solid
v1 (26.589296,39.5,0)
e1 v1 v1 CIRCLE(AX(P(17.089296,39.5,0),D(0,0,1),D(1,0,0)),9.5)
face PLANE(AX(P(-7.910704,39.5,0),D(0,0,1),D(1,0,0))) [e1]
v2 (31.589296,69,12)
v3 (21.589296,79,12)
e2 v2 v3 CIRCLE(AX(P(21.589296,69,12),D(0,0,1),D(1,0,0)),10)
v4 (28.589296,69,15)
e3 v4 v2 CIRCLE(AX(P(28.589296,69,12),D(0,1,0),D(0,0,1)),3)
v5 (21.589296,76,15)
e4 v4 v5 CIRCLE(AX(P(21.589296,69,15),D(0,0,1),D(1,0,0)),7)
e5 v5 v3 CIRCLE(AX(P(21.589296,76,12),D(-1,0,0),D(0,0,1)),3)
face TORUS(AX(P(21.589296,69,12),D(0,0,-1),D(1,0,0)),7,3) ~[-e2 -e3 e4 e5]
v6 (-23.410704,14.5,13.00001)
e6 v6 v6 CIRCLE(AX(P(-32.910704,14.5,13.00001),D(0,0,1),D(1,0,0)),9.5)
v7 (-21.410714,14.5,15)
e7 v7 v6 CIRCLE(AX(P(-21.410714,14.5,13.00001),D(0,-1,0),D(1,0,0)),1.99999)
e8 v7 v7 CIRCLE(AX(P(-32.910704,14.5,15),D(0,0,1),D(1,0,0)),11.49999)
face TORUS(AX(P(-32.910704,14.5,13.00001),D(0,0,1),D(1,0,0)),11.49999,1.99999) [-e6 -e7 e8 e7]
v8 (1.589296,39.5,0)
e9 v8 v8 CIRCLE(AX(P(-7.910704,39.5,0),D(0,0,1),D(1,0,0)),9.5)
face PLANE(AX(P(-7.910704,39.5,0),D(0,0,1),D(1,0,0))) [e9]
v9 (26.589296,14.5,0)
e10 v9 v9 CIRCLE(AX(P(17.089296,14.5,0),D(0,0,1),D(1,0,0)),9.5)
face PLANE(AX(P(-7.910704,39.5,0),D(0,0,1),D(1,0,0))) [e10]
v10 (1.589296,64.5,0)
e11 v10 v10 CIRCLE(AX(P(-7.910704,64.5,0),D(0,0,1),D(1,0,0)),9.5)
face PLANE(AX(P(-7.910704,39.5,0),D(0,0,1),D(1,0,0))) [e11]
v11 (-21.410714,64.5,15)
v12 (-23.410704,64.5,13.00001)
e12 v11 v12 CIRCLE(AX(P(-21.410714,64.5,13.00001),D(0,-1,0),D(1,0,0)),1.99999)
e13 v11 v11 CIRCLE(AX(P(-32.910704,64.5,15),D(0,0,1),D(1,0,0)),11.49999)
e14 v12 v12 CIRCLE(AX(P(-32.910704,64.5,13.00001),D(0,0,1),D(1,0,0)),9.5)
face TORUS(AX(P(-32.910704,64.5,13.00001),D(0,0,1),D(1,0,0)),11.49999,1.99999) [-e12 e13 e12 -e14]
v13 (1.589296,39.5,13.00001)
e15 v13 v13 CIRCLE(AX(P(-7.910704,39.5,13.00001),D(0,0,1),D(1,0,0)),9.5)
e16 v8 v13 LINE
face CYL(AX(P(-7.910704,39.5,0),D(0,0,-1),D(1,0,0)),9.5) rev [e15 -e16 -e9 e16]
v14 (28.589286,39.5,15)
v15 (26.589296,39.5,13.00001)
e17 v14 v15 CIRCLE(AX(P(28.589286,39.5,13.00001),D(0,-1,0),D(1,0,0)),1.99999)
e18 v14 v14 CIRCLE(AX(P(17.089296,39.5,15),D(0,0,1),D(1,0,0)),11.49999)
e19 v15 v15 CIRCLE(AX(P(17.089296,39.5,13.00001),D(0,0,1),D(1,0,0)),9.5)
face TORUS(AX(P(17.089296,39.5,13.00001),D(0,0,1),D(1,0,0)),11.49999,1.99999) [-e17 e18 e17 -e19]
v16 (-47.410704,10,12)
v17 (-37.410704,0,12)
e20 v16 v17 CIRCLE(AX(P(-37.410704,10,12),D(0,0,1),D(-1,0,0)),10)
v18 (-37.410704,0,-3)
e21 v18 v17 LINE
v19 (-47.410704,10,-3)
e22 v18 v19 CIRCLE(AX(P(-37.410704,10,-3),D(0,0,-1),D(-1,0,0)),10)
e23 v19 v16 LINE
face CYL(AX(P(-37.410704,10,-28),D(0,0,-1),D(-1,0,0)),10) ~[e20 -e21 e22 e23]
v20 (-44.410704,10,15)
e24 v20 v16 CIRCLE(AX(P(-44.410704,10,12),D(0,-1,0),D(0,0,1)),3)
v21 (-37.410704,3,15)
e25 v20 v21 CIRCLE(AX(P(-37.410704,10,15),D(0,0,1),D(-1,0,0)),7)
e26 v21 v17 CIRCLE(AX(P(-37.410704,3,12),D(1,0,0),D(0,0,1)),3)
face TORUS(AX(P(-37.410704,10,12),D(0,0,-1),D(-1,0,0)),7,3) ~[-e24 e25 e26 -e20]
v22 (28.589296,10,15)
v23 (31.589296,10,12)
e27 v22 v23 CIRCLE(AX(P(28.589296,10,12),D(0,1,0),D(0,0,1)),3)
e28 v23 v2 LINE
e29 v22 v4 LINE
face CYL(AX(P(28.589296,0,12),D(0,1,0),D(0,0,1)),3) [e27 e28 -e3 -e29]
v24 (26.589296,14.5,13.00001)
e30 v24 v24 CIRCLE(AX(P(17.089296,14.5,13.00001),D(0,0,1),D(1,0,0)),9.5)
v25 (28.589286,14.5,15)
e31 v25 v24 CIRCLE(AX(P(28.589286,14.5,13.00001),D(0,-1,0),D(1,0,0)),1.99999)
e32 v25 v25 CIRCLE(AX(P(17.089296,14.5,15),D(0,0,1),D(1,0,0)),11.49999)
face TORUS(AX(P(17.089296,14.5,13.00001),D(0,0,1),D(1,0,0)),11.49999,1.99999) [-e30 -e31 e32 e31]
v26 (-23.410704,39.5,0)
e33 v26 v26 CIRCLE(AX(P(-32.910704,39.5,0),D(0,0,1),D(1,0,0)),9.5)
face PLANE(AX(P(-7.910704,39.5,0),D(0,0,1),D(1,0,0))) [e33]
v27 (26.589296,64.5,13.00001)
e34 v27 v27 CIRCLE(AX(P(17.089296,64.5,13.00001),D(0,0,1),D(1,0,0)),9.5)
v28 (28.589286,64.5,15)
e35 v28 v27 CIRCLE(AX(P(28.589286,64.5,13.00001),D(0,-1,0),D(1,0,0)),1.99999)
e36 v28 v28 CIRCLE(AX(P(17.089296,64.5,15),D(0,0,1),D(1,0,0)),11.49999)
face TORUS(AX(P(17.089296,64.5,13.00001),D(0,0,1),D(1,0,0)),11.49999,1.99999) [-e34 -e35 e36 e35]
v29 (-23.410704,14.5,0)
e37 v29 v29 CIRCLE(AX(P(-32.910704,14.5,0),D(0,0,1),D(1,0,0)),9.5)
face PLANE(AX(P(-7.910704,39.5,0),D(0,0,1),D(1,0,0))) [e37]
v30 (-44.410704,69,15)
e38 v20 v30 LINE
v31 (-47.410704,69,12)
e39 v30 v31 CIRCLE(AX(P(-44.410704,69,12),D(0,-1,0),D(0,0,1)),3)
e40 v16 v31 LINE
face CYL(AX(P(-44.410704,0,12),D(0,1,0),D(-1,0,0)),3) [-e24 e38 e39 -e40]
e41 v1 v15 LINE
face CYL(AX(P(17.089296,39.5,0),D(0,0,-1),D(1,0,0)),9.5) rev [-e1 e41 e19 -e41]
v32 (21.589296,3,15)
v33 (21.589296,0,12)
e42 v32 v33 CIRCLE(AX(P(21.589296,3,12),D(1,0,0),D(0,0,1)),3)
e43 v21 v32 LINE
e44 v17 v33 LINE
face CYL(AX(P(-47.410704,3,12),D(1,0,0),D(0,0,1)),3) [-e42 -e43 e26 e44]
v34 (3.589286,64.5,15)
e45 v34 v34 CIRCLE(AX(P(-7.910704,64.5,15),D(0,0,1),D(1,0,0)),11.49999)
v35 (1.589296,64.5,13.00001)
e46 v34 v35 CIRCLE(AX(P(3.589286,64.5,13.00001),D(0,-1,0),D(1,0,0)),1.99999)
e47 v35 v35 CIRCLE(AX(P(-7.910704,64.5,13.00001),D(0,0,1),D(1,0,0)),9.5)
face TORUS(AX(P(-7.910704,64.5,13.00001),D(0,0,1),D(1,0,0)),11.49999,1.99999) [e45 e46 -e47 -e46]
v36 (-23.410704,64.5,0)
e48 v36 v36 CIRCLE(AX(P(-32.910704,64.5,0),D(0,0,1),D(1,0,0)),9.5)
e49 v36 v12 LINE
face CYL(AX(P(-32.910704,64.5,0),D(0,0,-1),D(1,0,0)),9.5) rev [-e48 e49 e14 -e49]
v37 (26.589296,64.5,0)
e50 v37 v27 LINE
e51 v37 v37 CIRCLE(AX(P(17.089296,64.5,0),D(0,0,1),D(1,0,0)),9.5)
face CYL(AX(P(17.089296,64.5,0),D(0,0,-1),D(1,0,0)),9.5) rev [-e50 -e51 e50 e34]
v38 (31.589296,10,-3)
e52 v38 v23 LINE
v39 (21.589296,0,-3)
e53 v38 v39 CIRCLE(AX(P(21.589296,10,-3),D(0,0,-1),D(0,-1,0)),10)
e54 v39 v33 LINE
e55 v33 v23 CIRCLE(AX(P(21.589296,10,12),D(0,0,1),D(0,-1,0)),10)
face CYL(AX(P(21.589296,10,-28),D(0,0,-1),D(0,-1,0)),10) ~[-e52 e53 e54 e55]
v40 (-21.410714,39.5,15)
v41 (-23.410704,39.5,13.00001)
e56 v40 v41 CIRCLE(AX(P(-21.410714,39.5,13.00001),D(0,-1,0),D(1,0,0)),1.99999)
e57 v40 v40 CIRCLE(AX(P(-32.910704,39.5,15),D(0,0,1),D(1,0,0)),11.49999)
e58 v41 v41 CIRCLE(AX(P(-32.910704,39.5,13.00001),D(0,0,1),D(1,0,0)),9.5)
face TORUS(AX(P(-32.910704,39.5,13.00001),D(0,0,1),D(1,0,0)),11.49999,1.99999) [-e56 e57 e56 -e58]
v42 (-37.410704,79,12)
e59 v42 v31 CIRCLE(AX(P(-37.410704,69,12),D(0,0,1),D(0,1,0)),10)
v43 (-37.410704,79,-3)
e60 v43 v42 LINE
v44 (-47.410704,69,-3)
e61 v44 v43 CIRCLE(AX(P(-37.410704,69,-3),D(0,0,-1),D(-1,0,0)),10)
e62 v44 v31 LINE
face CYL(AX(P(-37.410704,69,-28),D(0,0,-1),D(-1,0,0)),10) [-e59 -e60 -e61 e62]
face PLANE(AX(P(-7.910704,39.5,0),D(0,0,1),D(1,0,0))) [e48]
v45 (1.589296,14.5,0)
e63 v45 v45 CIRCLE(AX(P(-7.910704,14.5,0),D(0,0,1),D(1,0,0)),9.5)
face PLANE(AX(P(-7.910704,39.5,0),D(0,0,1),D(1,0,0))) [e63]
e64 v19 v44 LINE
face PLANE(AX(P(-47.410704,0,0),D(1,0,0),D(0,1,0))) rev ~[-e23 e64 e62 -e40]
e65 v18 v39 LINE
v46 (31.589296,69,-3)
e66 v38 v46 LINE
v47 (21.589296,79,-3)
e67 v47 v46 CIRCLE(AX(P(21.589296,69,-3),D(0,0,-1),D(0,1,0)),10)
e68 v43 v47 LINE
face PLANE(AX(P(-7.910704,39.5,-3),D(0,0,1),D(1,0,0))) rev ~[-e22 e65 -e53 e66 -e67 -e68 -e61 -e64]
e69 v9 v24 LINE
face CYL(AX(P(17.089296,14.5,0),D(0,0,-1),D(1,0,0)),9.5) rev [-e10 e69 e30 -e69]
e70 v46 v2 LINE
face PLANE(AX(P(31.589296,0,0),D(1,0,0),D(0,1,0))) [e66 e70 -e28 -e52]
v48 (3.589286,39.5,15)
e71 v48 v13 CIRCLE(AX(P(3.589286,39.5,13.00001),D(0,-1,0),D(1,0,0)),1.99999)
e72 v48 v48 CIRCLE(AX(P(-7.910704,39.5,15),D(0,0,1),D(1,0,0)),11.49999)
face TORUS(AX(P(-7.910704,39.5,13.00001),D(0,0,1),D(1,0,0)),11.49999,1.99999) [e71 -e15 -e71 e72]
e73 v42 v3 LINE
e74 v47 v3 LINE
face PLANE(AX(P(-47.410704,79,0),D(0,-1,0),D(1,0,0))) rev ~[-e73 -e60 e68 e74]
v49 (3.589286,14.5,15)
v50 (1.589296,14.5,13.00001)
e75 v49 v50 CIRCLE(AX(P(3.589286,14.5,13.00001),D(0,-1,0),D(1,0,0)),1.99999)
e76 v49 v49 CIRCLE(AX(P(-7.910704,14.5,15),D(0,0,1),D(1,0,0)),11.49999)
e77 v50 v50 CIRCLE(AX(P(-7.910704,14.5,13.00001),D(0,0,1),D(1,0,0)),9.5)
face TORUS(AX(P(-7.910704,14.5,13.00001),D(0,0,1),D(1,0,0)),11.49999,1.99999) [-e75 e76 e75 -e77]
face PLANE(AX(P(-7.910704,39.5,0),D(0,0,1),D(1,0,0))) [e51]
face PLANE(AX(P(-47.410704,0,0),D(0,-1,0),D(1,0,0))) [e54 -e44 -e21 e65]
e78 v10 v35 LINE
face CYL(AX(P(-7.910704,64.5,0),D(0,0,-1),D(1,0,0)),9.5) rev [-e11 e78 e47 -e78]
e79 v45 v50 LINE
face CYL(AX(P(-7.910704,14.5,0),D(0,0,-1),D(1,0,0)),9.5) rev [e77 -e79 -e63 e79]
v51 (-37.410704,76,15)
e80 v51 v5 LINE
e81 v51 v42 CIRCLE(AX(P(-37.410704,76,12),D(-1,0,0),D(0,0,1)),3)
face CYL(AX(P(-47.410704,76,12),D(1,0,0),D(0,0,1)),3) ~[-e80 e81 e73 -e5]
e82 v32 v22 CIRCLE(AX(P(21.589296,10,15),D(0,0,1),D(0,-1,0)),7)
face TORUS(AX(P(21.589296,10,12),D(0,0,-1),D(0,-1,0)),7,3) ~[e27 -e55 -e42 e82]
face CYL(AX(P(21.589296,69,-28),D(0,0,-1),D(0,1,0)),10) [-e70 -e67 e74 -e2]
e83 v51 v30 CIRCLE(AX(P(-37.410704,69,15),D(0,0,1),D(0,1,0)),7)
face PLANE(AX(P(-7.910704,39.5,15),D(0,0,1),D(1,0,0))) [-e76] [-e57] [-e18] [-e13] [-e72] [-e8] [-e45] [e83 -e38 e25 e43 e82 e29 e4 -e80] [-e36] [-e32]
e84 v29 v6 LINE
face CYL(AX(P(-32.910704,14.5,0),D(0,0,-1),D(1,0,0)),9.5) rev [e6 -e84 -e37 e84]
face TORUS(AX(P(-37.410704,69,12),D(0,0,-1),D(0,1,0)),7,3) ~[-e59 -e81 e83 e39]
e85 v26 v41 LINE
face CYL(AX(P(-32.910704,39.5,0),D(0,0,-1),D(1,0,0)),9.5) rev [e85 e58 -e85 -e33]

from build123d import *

# Parameters (mm, degrees)
F0_W         = 79
F0_H         = 79
F0_R         = 9.5
F1_DEPTH     = 15
F2_DEPTH     = 3
F3_R         = 3
F4_R         = 1.99999
F5_T1_DEPTH  = 43
F5_T4_ANGLE  = 90
F5_T6_ANGLE  = 90
F5_T8_ANGLE  = 90
F5_T10_ANGLE = 90


# Not quite as in the source:
# - a fillet or chamfer that OpenCascade refuses, or shapes differently, is made with other operations: its cross-section is extruded or revolved along the edge and cut away or added
# - a fillet or chamfer is up to 0.001 mm smaller than in the source, because OpenCascade refuses the exact size


with BuildPart() as f1:
    # F0 (on Top) → F1 (new body)
    with BuildSketch(Plane.XY):
        with Locations((-7.91070396, 39.5)):
            Rectangle(F0_W, F0_H)
        with Locations((-32.91070396, 14.5)):
            Circle(F0_R, mode=Mode.SUBTRACT)
        with Locations((-7.91070396, 14.5)):
            Circle(F0_R, mode=Mode.SUBTRACT)
        with Locations((17.08929604, 14.5)):
            Circle(F0_R, mode=Mode.SUBTRACT)
        with Locations((-32.91070396, 39.5)):
            Circle(F0_R, mode=Mode.SUBTRACT)
        with Locations((-32.91070396, 64.5)):
            Circle(F0_R, mode=Mode.SUBTRACT)
        with Locations((-7.91070396, 39.5)):
            Circle(F0_R, mode=Mode.SUBTRACT)
        with Locations((17.08929604, 39.5)):
            Circle(F0_R, mode=Mode.SUBTRACT)
        with Locations((-7.91070396, 64.5)):
            Circle(F0_R, mode=Mode.SUBTRACT)
        with Locations((17.08929604, 64.5)):
            Circle(F0_R, mode=Mode.SUBTRACT)
    extrude(amount=F1_DEPTH)

    # F0 (on Top) → F2 (join)
    with BuildSketch(Plane.XY):
        with Locations((-7.91070396, 39.5)):
            Rectangle(F0_W, F0_H)
        with Locations((-32.91070396, 14.5)):
            Circle(F0_R, mode=Mode.SUBTRACT)
        with Locations((-7.91070396, 14.5)):
            Circle(F0_R, mode=Mode.SUBTRACT)
        with Locations((17.08929604, 14.5)):
            Circle(F0_R, mode=Mode.SUBTRACT)
        with Locations((-32.91070396, 39.5)):
            Circle(F0_R, mode=Mode.SUBTRACT)
        with Locations((-32.91070396, 64.5)):
            Circle(F0_R, mode=Mode.SUBTRACT)
        with Locations((-7.91070396, 39.5)):
            Circle(F0_R, mode=Mode.SUBTRACT)
        with Locations((17.08929604, 39.5)):
            Circle(F0_R, mode=Mode.SUBTRACT)
        with Locations((-7.91070396, 64.5)):
            Circle(F0_R, mode=Mode.SUBTRACT)
        with Locations((17.08929604, 64.5)):
            Circle(F0_R, mode=Mode.SUBTRACT)
        with Locations((17.08929604, 64.5)):
            Circle(F0_R)
        with Locations((-7.91070396, 64.5)):
            Circle(F0_R)
        with Locations((-32.91070396, 64.5)):
            Circle(F0_R)
        with Locations((-32.91070396, 39.5)):
            Circle(F0_R)
        with Locations((-7.91070396, 39.5)):
            Circle(F0_R)
        with Locations((17.08929604, 39.5)):
            Circle(F0_R)
        with Locations((17.08929604, 14.5)):
            Circle(F0_R)
        with Locations((-7.91070396, 14.5)):
            Circle(F0_R)
        with Locations((-32.91070396, 14.5)):
            Circle(F0_R)
    extrude(amount=-F2_DEPTH)

    # F3
    f3_edges = [f1.edges().sort_by_distance(p)[0] for p in [
        (-47.410704, 39.5, 15),
        (-7.910704, 79, 15),
        (31.589296, 39.5, 15),
        (-7.910704, 0, 15),
    ]]
    fillet(f3_edges, radius=F3_R)

    # F4 (radius 2 in the source; OpenCascade refuses exactly that, so slightly less here)
    f4_edges = [f1.edges().sort_by_distance(p)[0] for p in [
        (-42.410704, 64.5, 15),
        (-17.410704, 64.5, 15),
        (7.589296, 64.5, 15),
        (7.589296, 39.5, 15),
        (7.589296, 14.5, 15),
        (-17.410704, 14.5, 15),
        (-17.410704, 39.5, 15),
        (-42.410704, 39.5, 15),
        (-42.410704, 14.5, 15),
    ]]
    fillet(f4_edges, radius=F4_R)

    # F5: fillet of radius 10 on 4 edges, made by hand

    # F5_s2 → F5_t1 (cut)
    with BuildSketch(Plane.XY.offset(-28)):
        with BuildLine():
            ThreePointArc((-47.41070396, 69), (-44.4817717719, 76.0710678119), (-37.41070396, 79))
            Line((-37.41070396, 79), (-47.41070396, 79))
            Line((-47.41070396, 79), (-47.41070396, 69))
        make_face()
        with BuildLine():
            ThreePointArc((21.58929604, 79), (28.6603638519, 76.0710678119), (31.58929604, 69))
            Line((31.58929604, 69), (31.58929604, 79))
            Line((31.58929604, 79), (21.58929604, 79))
        make_face()
        with BuildLine():
            ThreePointArc((21.58929604, 0), (28.6603638519, 2.9289321881), (31.58929604, 10))
            Line((31.58929604, 10), (31.58929604, 0))
            Line((31.58929604, 0), (21.58929604, 0))
        make_face()
        with BuildLine():
            ThreePointArc((-47.41070396, 10), (-44.4817717719, 2.9289321881), (-37.41070396, 0))
            Line((-37.41070396, 0), (-47.41070396, 0))
            Line((-47.41070396, 0), (-47.41070396, 10))
        make_face()
    extrude(amount=F5_T1_DEPTH, mode=Mode.SUBTRACT)

    # F5_s3 → F5_t4 (revolve, cut)
    with BuildSketch(Plane.XZ.offset(-10)):
        with BuildLine():
            ThreePointArc((-44.41070396, 15), (-46.5320243036, 14.1213203436), (-47.41070396, 12))
            Line((-47.41070396, 12), (-47.41070396, 15))
            Line((-47.41070396, 15), (-44.41070396, 15))
        make_face()
    revolve(axis=Axis((-37.41070396, 10, 15), (0, 0, 1)), revolution_arc=F5_T4_ANGLE, mode=Mode.SUBTRACT)

    # F5_s5 → F5_t6 (revolve, cut)
    with BuildSketch(Plane.YZ.offset(21.58929604)):
        with BuildLine():
            ThreePointArc((3, 15), (0.8786796564, 14.1213203436), (0, 12))
            Line((0, 12), (0, 15))
            Line((0, 15), (3, 15))
        make_face()
    revolve(axis=Axis((21.58929604, 10, 15), (0, 0, 1)), revolution_arc=F5_T6_ANGLE, mode=Mode.SUBTRACT)

    # F5_s7 → F5_t8 (revolve, cut)
    with BuildSketch(Plane.XZ.offset(-69)):
        with BuildLine():
            ThreePointArc((28.58929604, 15), (30.7106163836, 14.1213203436), (31.58929604, 12))
            Line((31.58929604, 12), (31.58929604, 15))
            Line((31.58929604, 15), (28.58929604, 15))
        make_face()
    revolve(axis=Axis((21.58929604, 69, 15), (0, 0, 1)), revolution_arc=F5_T8_ANGLE, mode=Mode.SUBTRACT)

    # F5_s9 → F5_t10 (revolve, cut)
    with BuildSketch(Plane.YZ.offset(-37.41070396)):
        with BuildLine():
            ThreePointArc((76, 15), (78.1213203436, 14.1213203436), (79, 12))
            Line((79, 12), (79, 15))
            Line((79, 15), (76, 15))
        make_face()
    revolve(axis=Axis((-37.41070396, 69, 15), (0, 0, 1)), revolution_arc=F5_T10_ANGLE, mode=Mode.SUBTRACT)


solid = f1.part
